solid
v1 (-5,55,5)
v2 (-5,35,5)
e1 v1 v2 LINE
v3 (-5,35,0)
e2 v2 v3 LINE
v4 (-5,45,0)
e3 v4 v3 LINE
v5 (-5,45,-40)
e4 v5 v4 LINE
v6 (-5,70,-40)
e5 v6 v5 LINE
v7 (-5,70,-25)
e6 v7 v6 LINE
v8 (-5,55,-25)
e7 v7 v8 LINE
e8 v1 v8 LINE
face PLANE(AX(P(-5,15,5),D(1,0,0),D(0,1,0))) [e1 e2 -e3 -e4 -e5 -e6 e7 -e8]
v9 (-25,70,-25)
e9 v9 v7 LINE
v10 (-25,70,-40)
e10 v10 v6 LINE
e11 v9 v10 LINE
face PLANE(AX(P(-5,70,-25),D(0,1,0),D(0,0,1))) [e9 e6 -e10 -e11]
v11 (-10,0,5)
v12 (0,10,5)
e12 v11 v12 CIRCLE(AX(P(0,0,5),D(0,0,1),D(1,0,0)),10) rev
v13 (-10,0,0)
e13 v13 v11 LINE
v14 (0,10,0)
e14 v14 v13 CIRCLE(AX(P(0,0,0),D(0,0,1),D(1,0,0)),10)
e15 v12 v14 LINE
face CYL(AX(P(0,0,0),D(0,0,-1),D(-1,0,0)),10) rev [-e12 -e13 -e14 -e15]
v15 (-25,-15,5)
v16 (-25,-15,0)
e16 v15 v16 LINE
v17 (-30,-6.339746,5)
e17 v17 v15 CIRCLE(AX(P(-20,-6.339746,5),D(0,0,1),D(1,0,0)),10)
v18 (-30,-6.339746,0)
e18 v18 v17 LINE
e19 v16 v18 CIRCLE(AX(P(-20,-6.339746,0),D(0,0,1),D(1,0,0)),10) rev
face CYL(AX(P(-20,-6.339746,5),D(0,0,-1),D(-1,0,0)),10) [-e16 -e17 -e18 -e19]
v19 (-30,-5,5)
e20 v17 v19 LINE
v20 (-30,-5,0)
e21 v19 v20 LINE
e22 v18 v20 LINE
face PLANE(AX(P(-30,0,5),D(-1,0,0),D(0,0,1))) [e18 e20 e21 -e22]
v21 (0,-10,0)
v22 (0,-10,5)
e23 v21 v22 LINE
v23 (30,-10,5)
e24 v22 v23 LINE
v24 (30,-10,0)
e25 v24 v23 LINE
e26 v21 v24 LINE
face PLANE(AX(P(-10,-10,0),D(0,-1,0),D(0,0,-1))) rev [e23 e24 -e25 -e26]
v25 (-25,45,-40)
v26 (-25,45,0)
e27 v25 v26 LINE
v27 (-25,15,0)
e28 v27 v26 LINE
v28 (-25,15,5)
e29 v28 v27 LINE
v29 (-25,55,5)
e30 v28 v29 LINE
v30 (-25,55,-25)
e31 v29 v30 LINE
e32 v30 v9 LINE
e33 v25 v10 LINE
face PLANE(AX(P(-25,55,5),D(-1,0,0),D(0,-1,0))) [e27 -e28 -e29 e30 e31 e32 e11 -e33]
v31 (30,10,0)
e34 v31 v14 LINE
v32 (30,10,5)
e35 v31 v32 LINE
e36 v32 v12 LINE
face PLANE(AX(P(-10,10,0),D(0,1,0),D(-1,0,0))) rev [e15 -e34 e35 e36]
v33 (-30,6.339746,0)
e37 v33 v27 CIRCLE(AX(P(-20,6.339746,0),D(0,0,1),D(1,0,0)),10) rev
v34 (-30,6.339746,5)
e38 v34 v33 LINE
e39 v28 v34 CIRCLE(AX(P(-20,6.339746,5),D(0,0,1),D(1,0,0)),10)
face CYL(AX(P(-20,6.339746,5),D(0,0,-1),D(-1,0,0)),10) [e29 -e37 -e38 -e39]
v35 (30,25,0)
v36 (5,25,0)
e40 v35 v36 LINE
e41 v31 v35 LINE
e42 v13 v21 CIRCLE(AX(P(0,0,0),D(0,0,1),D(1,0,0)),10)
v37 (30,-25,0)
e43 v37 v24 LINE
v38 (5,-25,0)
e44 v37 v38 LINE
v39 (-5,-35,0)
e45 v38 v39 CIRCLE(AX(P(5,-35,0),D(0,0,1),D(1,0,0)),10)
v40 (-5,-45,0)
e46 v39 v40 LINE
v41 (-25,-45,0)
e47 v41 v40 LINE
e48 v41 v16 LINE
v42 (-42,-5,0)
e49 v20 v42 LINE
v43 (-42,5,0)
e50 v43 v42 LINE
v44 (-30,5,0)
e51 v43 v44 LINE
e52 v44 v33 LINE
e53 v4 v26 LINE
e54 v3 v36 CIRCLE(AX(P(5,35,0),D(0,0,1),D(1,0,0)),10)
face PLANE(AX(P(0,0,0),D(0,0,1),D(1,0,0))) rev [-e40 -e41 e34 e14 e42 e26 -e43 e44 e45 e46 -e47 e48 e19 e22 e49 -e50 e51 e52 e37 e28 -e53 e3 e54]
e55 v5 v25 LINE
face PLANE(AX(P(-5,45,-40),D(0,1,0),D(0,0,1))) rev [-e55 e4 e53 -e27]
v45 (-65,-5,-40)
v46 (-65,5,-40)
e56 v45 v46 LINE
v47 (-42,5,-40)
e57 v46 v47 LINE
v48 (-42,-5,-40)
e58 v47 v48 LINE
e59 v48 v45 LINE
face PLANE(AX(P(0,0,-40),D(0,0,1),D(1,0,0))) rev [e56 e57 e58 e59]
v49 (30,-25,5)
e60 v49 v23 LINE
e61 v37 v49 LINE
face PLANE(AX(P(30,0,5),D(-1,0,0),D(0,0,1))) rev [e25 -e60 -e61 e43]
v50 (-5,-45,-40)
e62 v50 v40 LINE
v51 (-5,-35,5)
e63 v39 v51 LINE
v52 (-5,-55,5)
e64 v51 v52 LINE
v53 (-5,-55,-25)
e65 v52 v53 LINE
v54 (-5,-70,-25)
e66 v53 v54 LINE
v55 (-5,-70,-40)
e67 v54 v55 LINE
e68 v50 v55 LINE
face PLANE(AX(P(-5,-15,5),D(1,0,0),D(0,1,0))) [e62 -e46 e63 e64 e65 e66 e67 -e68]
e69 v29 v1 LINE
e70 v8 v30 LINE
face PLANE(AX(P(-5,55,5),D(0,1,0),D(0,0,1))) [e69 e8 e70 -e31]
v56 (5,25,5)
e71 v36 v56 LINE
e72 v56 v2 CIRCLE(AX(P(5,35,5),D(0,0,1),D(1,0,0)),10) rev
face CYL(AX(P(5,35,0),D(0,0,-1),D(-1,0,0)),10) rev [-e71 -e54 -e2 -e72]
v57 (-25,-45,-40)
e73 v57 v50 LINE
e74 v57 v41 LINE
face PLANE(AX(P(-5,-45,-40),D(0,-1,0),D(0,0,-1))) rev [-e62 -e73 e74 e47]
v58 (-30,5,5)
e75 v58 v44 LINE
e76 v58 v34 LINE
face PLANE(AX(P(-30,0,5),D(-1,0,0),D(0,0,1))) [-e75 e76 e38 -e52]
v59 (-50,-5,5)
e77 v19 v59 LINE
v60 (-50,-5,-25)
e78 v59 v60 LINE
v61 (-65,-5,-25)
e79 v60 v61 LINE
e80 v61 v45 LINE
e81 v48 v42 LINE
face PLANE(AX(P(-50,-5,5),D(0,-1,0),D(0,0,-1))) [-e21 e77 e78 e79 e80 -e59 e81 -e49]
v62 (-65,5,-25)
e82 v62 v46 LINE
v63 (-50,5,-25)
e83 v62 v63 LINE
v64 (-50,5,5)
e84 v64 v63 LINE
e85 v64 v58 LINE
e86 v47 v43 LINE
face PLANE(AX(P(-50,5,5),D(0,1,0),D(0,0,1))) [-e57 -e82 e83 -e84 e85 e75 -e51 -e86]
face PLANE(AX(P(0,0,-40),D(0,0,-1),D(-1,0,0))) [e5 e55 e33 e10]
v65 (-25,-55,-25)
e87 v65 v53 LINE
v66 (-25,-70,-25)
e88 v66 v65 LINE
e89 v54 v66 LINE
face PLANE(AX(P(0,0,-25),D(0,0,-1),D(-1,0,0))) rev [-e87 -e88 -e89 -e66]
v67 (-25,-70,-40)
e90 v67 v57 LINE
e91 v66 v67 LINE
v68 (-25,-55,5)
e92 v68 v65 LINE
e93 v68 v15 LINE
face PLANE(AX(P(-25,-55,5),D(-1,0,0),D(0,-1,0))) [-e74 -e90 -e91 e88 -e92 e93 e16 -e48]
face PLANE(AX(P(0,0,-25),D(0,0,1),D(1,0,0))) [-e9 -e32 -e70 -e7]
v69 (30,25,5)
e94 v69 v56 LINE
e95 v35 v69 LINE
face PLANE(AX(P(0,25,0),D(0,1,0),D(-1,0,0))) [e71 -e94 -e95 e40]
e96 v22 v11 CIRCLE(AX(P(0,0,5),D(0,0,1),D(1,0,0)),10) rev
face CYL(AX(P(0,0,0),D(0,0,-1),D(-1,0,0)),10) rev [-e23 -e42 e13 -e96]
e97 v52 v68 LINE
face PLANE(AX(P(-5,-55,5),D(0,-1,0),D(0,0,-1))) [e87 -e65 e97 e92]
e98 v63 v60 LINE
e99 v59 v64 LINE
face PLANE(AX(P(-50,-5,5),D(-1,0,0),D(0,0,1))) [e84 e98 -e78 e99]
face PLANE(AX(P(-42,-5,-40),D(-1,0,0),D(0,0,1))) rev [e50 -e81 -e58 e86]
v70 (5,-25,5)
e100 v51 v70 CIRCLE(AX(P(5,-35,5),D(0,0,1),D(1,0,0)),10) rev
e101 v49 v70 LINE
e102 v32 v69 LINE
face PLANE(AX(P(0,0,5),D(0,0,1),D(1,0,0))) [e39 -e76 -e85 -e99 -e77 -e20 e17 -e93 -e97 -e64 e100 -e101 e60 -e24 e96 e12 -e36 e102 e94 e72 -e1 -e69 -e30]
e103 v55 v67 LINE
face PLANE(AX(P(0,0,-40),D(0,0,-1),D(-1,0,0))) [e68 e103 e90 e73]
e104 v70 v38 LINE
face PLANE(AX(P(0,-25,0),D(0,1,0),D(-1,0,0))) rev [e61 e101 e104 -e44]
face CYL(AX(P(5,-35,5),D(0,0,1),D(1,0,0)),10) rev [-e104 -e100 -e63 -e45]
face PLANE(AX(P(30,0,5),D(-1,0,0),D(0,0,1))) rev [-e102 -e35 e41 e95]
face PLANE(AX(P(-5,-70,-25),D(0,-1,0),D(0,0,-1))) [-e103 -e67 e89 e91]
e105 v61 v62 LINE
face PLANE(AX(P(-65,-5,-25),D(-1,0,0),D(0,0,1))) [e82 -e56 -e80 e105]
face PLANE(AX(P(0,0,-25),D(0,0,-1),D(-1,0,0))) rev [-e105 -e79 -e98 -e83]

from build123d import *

# Parameters (mm, degrees)
SKETCH_1_W          = 60
SKETCH_1_H          = 30
EXTRUDE_1_DEPTH     = 5
SKETCH_2_W          = 7.4
SKETCH_2_H          = 1.2
SKETCH_2_W_2        = 7
SKETCH_2_H_2        = 0.8
CUT_EXTRUDE_1_DEPTH = 10
SKETCH_3_W          = 40.4
SKETCH_3_H          = 20.4
SKETCH_3_W_2        = 40
SKETCH_3_H_2        = 20
CUT_EXTRUDE_2_DEPTH = 10
SKETCH_5_W          = 20
SKETCH_5_H          = 40
SKETCH_5_H_2        = 10
EXTRUDE_2_DEPTH     = 5
SKETCH_6_W          = 20
SKETCH_6_H          = 10
SKETCH_6_W_2        = 8
EXTRUDE_3_DEPTH     = 40
SKETCH_7_W          = 20
SKETCH_7_H          = 15
SKETCH_7_W_2        = 15
SKETCH_7_H_2        = 10
EXTRUDE_4_DEPTH     = 15
SKETCH_8_W          = 54.931929912
SKETCH_8_H          = 24.682509144
EXTRUDE_5_DEPTH     = 5
SKETCH_9_W          = 40
SKETCH_9_H          = 20
CUT_EXTRUDE_3_DEPTH = 5
SKETCH_10_W         = 35
SKETCH_10_H         = 10
EXTRUDE_6_DEPTH     = 5
FILLET_2_R          = 10
FILLET_3_R          = 10


# Some blends are built 0.0001 mm under size
with BuildPart() as part:
    # 草图1 → 凸台-拉伸1 (new body)
    with BuildSketch(Plane.XY):
        Rectangle(SKETCH_1_W, SKETCH_1_H)
        Polygon((20, 0.4), (20, 10), (-20, 10), (-20, 0.4), (-27, 0.4), (-27, -0.4), (-20, -0.4), (-20, -10), (20, -10), (20, -0.4), (27, -0.4), (27, 0.4), align=None, mode=Mode.SUBTRACT)
    extrude(amount=EXTRUDE_1_DEPTH)

    # 草图2 → 切除-拉伸1 (cut)
    # profile 1 of 2: a face of its own
    with BuildSketch(Plane.XY.offset(5)):
        with Locations((-23.5, 0)):
            Rectangle(SKETCH_2_W, SKETCH_2_H)
        with Locations((-23.5, 0)):
            Rectangle(SKETCH_2_W_2, SKETCH_2_H_2, mode=Mode.SUBTRACT)
    # profile 2 of 2: a face of its own
    with BuildSketch(Plane.XY.offset(5)):
        with Locations((23.5, 0)):
            Rectangle(SKETCH_2_W, SKETCH_2_H)
        with Locations((23.5, 0)):
            Rectangle(SKETCH_2_W_2, SKETCH_2_H_2, mode=Mode.SUBTRACT)
    extrude(amount=-CUT_EXTRUDE_1_DEPTH, mode=Mode.SUBTRACT)

    # 草图3 → 切除-拉伸2 (cut)
    with BuildSketch(Plane.XY.offset(5)):
        Rectangle(SKETCH_3_W, SKETCH_3_H)
        Rectangle(SKETCH_3_W_2, SKETCH_3_H_2, mode=Mode.SUBTRACT)
    extrude(amount=-CUT_EXTRUDE_2_DEPTH, mode=Mode.SUBTRACT)

    # 草图5 → 凸台-拉伸2 (add)
    with BuildSketch(Plane(origin=(0, 0, 0), x_dir=(-1, 0, 0), z_dir=(0, 0, -1))):
        with Locations((15, 35)):
            Rectangle(SKETCH_5_W, SKETCH_5_H)
        with Locations((15, -35)):
            Rectangle(SKETCH_5_W, SKETCH_5_H)
        with Locations((40, 0)):
            Rectangle(SKETCH_5_W, SKETCH_5_H_2)
    extrude(amount=-EXTRUDE_2_DEPTH)

    # 草图6 → 凸台-拉伸3 (add)
    with BuildSketch(Plane(origin=(0, 0, 0), x_dir=(-1, 0, 0), z_dir=(0, 0, -1))):
        with Locations((15, 50)):
            Rectangle(SKETCH_6_W, SKETCH_6_H)
        with Locations((15, -50)):
            Rectangle(SKETCH_6_W, SKETCH_6_H)
        with Locations((46, 0)):
            Rectangle(SKETCH_6_W_2, SKETCH_6_H)
    extrude(amount=EXTRUDE_3_DEPTH)

    # 草图7 → 凸台-拉伸4 (add)
    with BuildSketch(Plane(origin=(0, 0, -40), x_dir=(-1, 0, 0), z_dir=(0, 0, -1))):
        with Locations((15, 62.5)):
            Rectangle(SKETCH_7_W, SKETCH_7_H)
        with Locations((15, -62.5)):
            Rectangle(SKETCH_7_W, SKETCH_7_H)
        with Locations((57.5, 0)):
            Rectangle(SKETCH_7_W_2, SKETCH_7_H_2)
    extrude(amount=-EXTRUDE_4_DEPTH)

    # 草图8 → 凸台-拉伸5 (add)
    with BuildSketch(Plane.XY.offset(5)):
        Rectangle(SKETCH_8_W, SKETCH_8_H)
    extrude(amount=-EXTRUDE_5_DEPTH)

    # 草图9 → 切除-拉伸3 (cut)
    with BuildSketch(Plane.XY.offset(5)):
        with Locations((10, 0)):
            Rectangle(SKETCH_9_W, SKETCH_9_H)
    extrude(amount=-CUT_EXTRUDE_3_DEPTH, mode=Mode.SUBTRACT)

    # 草图10 → 凸台-拉伸6 (add)
    with BuildSketch(Plane.XY.offset(5)):
        with Locations((12.5, 20)):
            Rectangle(SKETCH_10_W, SKETCH_10_H)
        with Locations((12.5, -20)):
            Rectangle(SKETCH_10_W, SKETCH_10_H)
    extrude(amount=-EXTRUDE_6_DEPTH)

    # 圆角2
    fillet_2_edges = [part.edges().sort_by_distance(p)[0] for p in [
        (-10, -10, 2.5),
        (-10, 10, 2.5),
        (-5, -25, 2.5),
        (-5, 25, 2.5),
    ]]
    fillet(fillet_2_edges, radius=FILLET_2_R - 0.0001)  # a hair under: the kernel refuses the full size

    # 圆角3
    # the kernel refuses this fillet: 10 mm, written as the material it takes off along each edge
    with BuildSketch(Plane(origin=(-30, -15, -21.650635095), x_dir=(0, 1, 0), z_dir=(0, 0, 1))) as fillet_3_piece_1:
        with BuildLine():
            CenterArc((8.660254038, -10), FILLET_3_R, 90, 60)
            Line((0, -5), (-0.173205081, -4.9))
            ThreePointArc((-0.173205081, -4.9), (-0.2, -2.5), (-0.2, 0))
            Line((-0.2, 0), (0, 0.2))
            Line((0, 0.2), (8.660254038, 0.2))
            Line((8.660254038, 0.2), (8.660254038, 0))
        make_face()
    extrude(amount=48.301270189, mode=Mode.SUBTRACT)
    with BuildSketch(Plane(origin=(-30, 15, -21.650635095), x_dir=(1, 0, 0), z_dir=(0, 0, 1))) as fillet_3_piece_2:
        with BuildLine():
            CenterArc((10, -8.660254038), FILLET_3_R, 120, 60)
            Line((0, -8.660254038), (-0.2, -8.660254038))
            Line((-0.2, -8.660254038), (-0.2, 0))
            Line((-0.2, 0), (0, 0.2))
            ThreePointArc((0, 0.2), (2.5, 0.2), (4.9, 0.173205081))
            Line((4.9, 0.173205081), (5, 0))
        make_face()
    extrude(amount=48.301270189, mode=Mode.SUBTRACT)


solid = part.part
